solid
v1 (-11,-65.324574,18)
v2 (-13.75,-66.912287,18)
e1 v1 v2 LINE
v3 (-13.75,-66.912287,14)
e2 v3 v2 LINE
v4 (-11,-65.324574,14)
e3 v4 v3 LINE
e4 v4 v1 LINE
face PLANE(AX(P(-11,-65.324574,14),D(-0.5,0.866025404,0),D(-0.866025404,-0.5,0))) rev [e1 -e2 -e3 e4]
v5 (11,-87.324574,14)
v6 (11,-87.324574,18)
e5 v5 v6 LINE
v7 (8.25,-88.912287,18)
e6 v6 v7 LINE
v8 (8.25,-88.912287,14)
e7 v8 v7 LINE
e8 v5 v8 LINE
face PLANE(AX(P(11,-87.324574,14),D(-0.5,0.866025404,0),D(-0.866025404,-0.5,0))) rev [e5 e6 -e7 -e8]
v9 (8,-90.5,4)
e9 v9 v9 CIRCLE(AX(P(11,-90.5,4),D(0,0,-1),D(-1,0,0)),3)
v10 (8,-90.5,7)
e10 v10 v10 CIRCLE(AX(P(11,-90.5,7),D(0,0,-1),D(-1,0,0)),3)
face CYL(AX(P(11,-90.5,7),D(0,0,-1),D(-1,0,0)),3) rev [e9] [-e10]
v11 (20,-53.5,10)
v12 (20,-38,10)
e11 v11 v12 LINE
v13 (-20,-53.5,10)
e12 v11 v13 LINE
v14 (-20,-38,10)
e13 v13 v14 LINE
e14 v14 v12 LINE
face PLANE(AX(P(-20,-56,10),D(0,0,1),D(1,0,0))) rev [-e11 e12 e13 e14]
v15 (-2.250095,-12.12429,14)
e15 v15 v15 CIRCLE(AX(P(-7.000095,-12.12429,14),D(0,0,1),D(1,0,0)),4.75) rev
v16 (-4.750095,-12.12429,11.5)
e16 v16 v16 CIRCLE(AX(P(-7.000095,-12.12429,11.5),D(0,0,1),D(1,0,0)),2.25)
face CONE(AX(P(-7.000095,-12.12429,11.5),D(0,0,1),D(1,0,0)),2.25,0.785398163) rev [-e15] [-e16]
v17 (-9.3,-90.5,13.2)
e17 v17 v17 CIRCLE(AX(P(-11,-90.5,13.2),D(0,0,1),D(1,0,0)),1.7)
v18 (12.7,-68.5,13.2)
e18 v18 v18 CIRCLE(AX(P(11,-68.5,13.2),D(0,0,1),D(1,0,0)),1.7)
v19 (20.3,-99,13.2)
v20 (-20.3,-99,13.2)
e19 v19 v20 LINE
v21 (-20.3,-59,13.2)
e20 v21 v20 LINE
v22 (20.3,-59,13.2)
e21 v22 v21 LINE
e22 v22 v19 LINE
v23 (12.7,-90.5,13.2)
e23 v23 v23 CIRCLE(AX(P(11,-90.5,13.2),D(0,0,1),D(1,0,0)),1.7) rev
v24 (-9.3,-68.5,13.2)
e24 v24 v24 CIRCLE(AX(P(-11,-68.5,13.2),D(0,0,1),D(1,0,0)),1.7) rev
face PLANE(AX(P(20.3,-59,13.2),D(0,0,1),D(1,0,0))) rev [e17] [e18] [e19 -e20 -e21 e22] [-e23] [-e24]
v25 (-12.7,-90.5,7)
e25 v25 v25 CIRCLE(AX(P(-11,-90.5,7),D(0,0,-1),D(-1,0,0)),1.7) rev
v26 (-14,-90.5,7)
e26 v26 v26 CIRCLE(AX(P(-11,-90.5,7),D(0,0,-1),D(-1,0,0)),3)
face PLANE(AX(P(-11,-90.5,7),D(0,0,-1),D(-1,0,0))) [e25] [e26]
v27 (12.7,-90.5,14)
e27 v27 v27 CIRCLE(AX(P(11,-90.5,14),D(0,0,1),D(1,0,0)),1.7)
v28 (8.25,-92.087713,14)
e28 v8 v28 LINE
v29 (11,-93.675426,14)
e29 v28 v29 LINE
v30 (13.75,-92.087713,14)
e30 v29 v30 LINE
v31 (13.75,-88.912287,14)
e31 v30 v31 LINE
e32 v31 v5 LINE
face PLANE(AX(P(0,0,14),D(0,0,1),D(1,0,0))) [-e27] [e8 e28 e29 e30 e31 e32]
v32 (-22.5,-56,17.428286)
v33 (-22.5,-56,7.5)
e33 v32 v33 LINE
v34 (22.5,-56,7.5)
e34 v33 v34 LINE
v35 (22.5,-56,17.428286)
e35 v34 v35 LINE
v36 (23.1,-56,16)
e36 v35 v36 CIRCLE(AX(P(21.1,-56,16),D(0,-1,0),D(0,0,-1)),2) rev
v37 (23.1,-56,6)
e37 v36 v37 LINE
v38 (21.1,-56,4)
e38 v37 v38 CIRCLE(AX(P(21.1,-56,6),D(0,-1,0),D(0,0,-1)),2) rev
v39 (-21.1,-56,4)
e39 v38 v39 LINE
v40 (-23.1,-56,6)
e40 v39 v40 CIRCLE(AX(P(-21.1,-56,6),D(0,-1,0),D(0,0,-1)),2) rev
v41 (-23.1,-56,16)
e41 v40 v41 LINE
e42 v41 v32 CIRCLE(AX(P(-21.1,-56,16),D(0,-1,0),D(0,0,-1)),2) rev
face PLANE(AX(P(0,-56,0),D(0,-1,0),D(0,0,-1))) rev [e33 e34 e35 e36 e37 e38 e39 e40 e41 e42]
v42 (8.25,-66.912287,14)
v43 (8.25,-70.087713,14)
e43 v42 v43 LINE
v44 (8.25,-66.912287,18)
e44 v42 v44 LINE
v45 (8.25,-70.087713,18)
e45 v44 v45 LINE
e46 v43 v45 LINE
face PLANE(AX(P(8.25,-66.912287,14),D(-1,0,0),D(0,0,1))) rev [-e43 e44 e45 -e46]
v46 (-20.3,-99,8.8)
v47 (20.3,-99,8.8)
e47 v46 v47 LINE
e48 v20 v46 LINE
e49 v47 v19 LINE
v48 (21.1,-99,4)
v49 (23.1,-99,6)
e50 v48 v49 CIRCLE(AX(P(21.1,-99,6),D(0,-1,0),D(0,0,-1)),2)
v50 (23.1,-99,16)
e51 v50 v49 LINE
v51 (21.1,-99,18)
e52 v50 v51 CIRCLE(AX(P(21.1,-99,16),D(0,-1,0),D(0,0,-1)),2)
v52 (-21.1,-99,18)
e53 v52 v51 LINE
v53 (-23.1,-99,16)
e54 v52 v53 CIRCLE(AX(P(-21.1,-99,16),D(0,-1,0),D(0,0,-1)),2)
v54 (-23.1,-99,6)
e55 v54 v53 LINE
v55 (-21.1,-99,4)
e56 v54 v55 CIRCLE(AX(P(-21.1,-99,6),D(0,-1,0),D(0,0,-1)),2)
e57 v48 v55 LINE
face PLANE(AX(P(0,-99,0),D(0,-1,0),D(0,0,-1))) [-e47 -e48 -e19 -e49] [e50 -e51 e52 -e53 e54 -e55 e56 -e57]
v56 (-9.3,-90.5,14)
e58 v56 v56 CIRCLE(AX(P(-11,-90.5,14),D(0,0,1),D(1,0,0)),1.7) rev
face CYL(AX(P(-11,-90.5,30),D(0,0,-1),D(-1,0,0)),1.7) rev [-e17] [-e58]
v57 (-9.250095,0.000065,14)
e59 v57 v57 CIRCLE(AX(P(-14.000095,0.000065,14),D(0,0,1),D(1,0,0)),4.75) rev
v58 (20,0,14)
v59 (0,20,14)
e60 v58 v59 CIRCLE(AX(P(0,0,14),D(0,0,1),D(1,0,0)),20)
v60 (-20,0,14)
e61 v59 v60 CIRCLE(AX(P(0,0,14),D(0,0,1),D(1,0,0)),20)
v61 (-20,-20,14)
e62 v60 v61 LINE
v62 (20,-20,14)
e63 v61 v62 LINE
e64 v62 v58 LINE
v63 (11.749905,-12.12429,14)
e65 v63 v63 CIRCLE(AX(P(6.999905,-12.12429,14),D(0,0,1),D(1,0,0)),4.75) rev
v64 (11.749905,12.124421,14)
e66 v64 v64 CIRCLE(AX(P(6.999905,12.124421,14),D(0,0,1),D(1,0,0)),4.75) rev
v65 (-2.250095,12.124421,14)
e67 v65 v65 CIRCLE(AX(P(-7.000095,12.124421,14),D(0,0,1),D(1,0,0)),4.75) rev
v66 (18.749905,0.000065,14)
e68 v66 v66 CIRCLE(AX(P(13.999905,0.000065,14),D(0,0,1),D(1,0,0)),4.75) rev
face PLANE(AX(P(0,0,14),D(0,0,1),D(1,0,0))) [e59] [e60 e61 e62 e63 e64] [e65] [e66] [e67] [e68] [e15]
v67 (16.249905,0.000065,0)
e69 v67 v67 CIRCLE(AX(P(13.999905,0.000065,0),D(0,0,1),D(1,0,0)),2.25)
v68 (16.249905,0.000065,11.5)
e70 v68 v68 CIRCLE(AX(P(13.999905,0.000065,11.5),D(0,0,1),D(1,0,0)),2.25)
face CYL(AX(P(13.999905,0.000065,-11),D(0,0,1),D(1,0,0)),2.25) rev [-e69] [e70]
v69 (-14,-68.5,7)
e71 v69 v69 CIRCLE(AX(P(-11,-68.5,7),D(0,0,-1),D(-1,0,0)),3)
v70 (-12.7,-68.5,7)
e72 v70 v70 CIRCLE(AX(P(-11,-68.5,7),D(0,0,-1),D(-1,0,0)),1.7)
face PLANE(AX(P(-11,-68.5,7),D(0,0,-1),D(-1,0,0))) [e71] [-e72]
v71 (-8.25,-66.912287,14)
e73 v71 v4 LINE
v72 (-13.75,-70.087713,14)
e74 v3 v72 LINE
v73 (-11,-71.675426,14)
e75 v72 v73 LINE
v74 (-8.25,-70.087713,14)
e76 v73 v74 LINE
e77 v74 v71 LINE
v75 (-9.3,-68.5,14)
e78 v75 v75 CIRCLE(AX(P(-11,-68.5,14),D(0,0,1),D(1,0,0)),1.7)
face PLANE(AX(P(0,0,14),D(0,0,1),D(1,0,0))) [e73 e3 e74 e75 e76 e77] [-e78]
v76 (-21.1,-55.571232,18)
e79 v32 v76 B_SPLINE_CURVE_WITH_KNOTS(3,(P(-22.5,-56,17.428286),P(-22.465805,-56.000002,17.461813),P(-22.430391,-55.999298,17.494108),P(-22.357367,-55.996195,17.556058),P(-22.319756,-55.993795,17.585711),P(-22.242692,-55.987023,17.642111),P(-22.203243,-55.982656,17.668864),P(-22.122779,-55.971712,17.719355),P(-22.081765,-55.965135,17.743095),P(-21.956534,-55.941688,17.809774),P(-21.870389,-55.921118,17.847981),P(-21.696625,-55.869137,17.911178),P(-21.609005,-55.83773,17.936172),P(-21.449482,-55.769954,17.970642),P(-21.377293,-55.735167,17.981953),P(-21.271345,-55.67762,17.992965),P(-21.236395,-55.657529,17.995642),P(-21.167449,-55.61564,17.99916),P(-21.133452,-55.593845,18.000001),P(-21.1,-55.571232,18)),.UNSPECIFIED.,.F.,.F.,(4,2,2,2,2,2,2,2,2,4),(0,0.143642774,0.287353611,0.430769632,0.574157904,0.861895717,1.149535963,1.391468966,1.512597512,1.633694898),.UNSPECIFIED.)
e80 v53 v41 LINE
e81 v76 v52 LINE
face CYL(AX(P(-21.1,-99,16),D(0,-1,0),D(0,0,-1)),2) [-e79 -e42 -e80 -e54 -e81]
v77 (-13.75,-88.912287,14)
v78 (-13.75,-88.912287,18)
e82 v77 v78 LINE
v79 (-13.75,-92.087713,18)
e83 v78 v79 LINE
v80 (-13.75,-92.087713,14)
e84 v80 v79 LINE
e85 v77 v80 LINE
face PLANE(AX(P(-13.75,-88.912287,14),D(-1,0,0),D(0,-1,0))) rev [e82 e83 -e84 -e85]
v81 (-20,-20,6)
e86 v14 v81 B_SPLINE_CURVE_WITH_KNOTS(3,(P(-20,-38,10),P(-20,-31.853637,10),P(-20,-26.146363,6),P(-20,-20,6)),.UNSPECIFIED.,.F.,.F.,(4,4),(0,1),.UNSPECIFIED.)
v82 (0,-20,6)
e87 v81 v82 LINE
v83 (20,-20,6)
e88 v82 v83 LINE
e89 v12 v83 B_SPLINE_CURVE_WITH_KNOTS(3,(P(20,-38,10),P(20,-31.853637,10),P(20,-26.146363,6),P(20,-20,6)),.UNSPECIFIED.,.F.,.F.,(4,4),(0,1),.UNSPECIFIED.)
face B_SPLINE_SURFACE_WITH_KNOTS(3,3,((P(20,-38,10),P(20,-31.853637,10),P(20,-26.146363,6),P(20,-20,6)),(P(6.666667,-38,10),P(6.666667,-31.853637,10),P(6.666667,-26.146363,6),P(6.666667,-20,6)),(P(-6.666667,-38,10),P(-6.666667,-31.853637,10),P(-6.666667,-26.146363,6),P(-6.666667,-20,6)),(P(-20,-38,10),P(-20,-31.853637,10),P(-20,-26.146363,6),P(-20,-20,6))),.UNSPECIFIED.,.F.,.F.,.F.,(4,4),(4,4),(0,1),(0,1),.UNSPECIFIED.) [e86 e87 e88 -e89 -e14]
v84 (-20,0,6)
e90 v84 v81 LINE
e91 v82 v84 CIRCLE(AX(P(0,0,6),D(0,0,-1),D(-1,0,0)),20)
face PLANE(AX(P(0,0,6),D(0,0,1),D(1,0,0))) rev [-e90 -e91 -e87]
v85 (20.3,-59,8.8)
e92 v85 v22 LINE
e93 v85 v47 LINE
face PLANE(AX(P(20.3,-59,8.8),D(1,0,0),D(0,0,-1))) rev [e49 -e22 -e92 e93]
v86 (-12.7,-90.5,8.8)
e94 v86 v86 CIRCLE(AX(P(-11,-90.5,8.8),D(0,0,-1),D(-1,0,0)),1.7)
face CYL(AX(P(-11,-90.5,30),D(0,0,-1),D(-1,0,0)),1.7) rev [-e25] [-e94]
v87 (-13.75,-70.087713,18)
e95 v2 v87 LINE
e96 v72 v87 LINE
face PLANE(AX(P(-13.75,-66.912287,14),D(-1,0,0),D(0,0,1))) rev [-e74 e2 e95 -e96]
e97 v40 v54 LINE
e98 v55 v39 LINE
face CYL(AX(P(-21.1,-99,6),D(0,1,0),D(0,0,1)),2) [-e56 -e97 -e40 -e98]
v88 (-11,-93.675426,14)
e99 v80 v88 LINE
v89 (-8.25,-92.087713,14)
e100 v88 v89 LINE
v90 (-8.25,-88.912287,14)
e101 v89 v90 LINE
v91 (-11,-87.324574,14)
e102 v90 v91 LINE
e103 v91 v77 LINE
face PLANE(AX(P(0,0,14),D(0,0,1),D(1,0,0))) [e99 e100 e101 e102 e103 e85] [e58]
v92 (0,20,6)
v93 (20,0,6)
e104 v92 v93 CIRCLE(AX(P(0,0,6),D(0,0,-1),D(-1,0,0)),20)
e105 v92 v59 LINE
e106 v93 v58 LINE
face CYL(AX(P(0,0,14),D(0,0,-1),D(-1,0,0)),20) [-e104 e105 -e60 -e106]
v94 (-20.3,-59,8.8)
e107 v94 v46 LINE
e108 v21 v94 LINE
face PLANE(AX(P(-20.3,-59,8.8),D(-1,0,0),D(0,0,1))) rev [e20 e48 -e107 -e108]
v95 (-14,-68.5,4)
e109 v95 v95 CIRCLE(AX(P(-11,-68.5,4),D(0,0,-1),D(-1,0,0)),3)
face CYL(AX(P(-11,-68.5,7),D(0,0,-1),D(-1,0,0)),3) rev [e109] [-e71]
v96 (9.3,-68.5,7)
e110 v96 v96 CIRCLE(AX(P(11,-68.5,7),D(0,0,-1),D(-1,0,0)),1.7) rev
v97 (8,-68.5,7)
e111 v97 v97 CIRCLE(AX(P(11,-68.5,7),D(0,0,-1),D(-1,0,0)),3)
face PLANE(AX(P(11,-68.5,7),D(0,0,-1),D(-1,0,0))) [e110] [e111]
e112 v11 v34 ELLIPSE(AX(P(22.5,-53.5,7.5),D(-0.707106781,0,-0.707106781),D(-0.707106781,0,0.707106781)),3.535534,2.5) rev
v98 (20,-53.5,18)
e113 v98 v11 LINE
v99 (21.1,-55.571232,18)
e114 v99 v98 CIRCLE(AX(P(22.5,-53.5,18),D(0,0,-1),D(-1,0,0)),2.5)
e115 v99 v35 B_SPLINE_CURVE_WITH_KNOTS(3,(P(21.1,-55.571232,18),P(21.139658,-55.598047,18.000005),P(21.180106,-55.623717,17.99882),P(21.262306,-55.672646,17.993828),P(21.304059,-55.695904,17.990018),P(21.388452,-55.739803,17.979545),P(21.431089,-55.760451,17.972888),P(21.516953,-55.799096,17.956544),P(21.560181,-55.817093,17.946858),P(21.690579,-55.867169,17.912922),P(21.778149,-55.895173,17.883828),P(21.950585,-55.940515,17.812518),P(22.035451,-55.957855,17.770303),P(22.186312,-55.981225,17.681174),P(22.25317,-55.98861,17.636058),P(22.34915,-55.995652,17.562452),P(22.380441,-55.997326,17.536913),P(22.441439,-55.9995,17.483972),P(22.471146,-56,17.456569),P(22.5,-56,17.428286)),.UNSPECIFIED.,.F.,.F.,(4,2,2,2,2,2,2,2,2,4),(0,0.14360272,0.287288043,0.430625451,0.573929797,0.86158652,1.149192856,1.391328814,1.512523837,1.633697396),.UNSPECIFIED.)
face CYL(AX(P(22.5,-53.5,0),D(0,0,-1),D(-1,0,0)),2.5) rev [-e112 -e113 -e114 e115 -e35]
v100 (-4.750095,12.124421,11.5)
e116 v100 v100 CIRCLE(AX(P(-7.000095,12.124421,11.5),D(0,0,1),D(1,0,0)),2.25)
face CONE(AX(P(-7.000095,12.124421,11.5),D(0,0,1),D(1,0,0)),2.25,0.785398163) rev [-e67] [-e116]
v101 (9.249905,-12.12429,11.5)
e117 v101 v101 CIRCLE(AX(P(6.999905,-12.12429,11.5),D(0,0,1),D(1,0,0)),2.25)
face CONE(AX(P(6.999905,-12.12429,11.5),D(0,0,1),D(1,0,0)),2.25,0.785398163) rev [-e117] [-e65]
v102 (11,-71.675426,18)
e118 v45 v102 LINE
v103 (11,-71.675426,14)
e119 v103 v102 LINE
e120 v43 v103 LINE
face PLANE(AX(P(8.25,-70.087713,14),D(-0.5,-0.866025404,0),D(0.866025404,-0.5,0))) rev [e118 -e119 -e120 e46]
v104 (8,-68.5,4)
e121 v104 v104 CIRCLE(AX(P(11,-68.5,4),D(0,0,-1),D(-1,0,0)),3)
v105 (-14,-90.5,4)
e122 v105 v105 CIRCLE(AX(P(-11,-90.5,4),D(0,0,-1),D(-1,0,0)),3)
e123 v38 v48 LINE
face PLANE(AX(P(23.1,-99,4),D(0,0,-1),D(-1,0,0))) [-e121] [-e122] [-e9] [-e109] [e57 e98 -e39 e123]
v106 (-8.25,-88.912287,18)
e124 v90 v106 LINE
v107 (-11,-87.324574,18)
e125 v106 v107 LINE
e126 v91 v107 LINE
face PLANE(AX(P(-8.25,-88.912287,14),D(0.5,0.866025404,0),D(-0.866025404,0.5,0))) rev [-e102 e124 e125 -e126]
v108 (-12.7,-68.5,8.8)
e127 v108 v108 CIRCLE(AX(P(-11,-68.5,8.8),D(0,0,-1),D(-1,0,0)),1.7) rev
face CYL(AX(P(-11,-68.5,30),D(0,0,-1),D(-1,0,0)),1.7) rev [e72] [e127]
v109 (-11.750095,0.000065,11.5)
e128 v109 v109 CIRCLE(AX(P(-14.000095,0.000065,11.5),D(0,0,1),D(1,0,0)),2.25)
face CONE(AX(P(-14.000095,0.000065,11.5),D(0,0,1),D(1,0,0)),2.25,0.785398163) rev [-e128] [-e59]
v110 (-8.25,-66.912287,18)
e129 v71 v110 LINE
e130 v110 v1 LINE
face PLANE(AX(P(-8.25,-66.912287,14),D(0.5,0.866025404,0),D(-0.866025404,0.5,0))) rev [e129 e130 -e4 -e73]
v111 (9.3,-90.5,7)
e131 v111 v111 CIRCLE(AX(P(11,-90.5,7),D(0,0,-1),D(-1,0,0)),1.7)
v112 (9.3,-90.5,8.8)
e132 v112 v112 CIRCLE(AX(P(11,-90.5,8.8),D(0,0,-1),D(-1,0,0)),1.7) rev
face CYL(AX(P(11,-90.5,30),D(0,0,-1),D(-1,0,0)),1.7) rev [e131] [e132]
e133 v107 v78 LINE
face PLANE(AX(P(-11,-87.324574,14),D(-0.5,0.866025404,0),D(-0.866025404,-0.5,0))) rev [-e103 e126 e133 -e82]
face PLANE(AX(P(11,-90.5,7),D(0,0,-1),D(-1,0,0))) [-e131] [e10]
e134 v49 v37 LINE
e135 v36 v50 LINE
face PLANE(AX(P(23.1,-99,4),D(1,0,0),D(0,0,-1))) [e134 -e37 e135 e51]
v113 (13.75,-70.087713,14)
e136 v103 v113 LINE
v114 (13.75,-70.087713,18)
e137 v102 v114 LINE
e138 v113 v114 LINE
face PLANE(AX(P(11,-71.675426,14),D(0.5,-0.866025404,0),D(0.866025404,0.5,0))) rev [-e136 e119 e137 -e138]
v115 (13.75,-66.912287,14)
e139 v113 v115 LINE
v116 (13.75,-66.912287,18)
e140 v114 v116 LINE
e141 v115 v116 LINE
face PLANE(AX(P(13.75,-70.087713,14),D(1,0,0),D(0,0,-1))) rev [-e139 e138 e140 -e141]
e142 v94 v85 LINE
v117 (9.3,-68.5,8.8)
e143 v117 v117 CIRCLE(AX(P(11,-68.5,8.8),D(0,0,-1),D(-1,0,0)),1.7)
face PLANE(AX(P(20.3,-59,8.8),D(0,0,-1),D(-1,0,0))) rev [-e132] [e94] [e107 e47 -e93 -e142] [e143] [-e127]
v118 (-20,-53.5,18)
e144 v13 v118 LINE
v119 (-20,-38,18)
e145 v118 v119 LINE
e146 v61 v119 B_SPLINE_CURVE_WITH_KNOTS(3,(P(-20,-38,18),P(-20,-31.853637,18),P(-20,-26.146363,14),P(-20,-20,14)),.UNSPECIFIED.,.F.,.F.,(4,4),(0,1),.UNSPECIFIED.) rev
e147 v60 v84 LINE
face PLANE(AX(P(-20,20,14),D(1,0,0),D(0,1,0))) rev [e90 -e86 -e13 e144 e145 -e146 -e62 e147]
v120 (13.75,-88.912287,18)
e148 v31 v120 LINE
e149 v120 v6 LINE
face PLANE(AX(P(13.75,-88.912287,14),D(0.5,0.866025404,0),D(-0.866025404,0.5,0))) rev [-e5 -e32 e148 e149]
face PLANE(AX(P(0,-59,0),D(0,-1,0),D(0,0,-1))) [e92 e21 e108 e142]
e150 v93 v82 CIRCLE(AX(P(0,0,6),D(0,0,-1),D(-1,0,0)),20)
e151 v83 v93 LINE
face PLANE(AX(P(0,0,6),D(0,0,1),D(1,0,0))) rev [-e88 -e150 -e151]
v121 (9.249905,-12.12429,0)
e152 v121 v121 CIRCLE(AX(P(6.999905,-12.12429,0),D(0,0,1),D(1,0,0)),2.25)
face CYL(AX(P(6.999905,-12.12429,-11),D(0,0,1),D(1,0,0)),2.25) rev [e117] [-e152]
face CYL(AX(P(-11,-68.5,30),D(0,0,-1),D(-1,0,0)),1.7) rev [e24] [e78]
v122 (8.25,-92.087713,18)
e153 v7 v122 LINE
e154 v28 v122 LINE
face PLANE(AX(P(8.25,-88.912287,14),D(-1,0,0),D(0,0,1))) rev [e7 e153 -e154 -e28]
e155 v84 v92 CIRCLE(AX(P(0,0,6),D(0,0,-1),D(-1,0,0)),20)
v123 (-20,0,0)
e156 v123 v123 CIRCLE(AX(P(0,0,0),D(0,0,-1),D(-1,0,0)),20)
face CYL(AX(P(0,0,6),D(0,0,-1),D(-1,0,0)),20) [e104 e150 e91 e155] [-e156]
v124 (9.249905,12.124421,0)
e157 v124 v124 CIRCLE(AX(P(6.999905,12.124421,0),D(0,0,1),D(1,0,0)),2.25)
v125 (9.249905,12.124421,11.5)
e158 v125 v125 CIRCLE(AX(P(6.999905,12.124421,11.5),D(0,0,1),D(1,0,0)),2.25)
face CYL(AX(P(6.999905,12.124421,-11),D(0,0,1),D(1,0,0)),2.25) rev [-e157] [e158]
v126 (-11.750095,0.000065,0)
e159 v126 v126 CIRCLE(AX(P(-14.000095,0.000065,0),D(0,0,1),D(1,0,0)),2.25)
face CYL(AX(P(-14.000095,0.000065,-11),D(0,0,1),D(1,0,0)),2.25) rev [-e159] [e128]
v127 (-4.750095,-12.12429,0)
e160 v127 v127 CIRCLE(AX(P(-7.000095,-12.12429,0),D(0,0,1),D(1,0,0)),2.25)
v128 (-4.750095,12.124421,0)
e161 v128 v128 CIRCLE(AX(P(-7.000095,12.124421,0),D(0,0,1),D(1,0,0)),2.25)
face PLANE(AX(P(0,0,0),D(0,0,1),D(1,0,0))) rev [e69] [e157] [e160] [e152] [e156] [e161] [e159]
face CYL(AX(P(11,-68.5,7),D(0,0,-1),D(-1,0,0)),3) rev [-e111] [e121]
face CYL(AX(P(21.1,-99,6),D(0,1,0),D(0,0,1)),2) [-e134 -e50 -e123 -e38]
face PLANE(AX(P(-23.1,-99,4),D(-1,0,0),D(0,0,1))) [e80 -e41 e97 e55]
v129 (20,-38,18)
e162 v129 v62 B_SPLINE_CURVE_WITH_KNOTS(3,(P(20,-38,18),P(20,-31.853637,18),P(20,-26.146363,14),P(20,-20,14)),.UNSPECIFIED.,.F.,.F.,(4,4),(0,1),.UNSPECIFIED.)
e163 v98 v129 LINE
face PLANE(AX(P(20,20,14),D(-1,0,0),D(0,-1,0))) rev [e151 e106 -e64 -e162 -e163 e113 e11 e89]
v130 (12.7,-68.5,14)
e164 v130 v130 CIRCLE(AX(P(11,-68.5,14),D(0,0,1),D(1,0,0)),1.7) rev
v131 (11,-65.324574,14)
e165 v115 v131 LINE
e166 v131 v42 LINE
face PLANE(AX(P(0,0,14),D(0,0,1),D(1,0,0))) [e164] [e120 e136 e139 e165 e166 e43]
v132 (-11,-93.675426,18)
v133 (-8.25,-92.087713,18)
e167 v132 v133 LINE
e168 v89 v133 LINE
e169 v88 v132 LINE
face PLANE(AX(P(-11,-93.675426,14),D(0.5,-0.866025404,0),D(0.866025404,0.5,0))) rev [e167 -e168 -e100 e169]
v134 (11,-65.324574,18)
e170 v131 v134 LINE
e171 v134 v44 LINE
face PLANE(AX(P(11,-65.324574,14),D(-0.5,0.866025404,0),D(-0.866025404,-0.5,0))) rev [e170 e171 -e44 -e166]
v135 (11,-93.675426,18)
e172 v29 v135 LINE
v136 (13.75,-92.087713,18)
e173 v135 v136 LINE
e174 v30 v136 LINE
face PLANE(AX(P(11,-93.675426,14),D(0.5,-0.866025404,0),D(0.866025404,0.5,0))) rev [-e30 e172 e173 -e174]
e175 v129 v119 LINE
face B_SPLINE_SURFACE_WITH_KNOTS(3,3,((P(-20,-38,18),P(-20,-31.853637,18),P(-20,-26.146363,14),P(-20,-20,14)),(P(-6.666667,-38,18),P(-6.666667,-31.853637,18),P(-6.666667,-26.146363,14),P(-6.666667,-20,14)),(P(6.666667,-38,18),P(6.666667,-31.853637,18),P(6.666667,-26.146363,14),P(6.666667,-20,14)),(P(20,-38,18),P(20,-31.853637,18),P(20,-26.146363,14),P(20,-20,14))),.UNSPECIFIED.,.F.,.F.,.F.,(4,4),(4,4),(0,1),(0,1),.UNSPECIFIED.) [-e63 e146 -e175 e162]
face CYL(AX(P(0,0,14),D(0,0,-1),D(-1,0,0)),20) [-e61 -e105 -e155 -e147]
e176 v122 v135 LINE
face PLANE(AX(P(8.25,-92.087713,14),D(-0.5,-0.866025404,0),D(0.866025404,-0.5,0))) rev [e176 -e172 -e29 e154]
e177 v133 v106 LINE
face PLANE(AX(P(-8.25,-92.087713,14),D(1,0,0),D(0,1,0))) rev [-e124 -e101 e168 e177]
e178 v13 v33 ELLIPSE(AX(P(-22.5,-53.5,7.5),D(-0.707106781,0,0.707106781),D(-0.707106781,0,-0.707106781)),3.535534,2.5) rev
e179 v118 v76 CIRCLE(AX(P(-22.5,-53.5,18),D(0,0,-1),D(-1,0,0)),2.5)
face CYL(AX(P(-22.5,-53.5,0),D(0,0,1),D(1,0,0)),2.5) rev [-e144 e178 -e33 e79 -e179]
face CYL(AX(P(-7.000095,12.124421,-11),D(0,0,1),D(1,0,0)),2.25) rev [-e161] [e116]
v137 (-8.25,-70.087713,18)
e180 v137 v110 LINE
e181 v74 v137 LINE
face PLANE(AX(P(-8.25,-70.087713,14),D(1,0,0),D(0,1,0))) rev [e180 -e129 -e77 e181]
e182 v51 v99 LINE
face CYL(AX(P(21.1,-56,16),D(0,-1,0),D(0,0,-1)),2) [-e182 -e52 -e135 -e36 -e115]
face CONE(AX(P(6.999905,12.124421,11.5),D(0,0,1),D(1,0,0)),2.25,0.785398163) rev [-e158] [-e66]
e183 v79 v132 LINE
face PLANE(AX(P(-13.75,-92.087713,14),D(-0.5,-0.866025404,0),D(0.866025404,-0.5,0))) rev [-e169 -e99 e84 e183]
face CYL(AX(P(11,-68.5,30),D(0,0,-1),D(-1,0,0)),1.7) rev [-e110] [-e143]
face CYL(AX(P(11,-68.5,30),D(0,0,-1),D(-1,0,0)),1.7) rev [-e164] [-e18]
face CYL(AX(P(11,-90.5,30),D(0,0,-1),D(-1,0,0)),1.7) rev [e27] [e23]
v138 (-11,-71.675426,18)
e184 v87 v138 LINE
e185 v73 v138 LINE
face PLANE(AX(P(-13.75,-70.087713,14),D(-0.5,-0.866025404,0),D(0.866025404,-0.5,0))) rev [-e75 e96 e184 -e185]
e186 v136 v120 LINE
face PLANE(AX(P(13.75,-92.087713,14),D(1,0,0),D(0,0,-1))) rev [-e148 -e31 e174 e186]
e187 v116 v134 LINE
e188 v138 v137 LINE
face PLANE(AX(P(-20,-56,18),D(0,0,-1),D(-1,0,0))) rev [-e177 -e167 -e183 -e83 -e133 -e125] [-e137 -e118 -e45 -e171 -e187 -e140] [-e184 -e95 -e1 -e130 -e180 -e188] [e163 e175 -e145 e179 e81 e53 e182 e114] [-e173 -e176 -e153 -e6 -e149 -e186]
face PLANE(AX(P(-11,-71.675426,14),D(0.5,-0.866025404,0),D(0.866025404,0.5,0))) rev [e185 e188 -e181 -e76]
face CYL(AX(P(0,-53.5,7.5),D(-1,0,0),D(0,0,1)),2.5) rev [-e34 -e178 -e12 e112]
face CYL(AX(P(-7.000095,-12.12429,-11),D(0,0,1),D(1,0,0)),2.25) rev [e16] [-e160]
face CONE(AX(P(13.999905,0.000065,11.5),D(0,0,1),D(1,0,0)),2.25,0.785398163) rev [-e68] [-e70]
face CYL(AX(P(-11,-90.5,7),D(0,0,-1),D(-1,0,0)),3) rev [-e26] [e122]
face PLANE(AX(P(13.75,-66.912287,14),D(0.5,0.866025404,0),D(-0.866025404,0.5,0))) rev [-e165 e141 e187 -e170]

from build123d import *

# Parameters (mm, degrees)
SKETCH7_W           = 40
SKETCH7_H           = 40
BOSS_EXTRUDE1_DEPTH = 14
LOFT1_START         = -20
LOFT1_DEPTH         = 40
SKETCH16_W          = 49.026286786
SKETCH16_H          = 65.242270374
SKETCH16_R          = 20
CUT_EXTRUDE3_DEPTH  = 6
SKETCH17_W          = 40
SKETCH17_H          = 8
BOSS_EXTRUDE5_DEPTH = 18
SKETCH10_R          = 2.25
CUT_EXTRUDE1_DEPTH  = 25
CHAMFER1_SIZE       = 2.5
FILLET3_R           = 20
SKETCH11_W          = 46.2
SKETCH11_H          = 14
BOSS_EXTRUDE6_DEPTH = 43
FILLET9_R           = 2.5
SKETCH20_W          = 40.6
SKETCH20_H          = 4.4
CUT_EXTRUDE4_DEPTH  = 40
SKETCH22_R          = 1.7
CUT_EXTRUDE5_DEPTH  = 30
FILLET11_R          = 2
CUT_EXTRUDE6_DEPTH  = 4
SKETCH24_R          = 3
CUT_EXTRUDE7_DEPTH  = 3


# Read off the part's stored shape, not the designer's step: Loft1
with BuildPart() as part:
    # Sketch7 → Boss-Extrude1 (new body)
    with BuildSketch(Plane.XY):
        Rectangle(SKETCH7_W, SKETCH7_H)
    extrude(amount=BOSS_EXTRUDE1_DEPTH)

    # Loft1 outline → Loft1 (add)
    with BuildSketch(Plane.YZ.offset(LOFT1_START)):
        with BuildLine():
            add(Edge.make_bspline(
                [(-38, 18), (-31.853637028, 18), (-26.146362972, 14), (-20, 14)],
                knots=[0, 0, 0, 0, 1, 1, 1, 1], degree=3))
            Line((-38, 18), (-38, 10))
            add(Edge.make_bspline(
                [(-38, 10), (-31.853637028, 10), (-26.146362972, 6), (-20, 6)],
                knots=[0, 0, 0, 0, 1, 1, 1, 1], degree=3))
            Line((-20, 6), (-20, 14))
        make_face()
    extrude(amount=LOFT1_DEPTH)

    # Sketch16 → Cut-Extrude3 (cut)
    with BuildSketch(Plane(origin=(0, 0, 0), x_dir=(-1, 0, 0), z_dir=(0, 0, -1))):
        Rectangle(SKETCH16_W, SKETCH16_H)
        Circle(SKETCH16_R, mode=Mode.SUBTRACT)
    extrude(amount=-CUT_EXTRUDE3_DEPTH, mode=Mode.SUBTRACT)

    # Sketch17 → Boss-Extrude5 (add)
    with BuildSketch(Plane(origin=(0, -38, 0), x_dir=(-1, 0, 0), z_dir=(0, -1, 0))):
        with Locations((0, -14)):
            Rectangle(SKETCH17_W, SKETCH17_H)
    extrude(amount=BOSS_EXTRUDE5_DEPTH)

    # Sketch10 → Cut-Extrude1 (cut)
    with BuildSketch(Plane.XY.offset(14)):
        with Locations((-7.00009521, 12.124420806)):
            Circle(SKETCH10_R)
        with Locations((6.99990479, 12.124420806)):
            Circle(SKETCH10_R)
        with Locations((13.99990479, 6.5153e-05)):
            Circle(SKETCH10_R)
        with Locations((6.99990479, -12.1242905)):
            Circle(SKETCH10_R)
        with Locations((-7.00009521, -12.1242905)):
            Circle(SKETCH10_R)
        with Locations((-14.00009521, 6.5153e-05)):
            Circle(SKETCH10_R)
    extrude(amount=-CUT_EXTRUDE1_DEPTH, mode=Mode.SUBTRACT)

    # Chamfer1
    chamfer1_edges = [part.edges().sort_by_distance(p)[0] for p in [
        (4.74990479, 12.124420806, 14),
        (-9.25009521, 12.124420806, 14),
        (-16.25009521, 6.5153e-05, 14),
        (-9.25009521, -12.1242905, 14),
        (4.74990479, -12.1242905, 14),
        (11.74990479, 6.5153e-05, 14),
    ]]
    chamfer(chamfer1_edges, length=CHAMFER1_SIZE)

    # Fillet3
    fillet3_edges = [part.edges().sort_by_distance(p)[0] for p in [
        (20, 20, 10),
        (-20, 20, 10),
    ]]
    fillet(fillet3_edges, radius=FILLET3_R - 0.0001)  # a hair under: the kernel refuses the full size

    # Sketch11 → Boss-Extrude6 (add)
    with BuildSketch(Plane(origin=(0, -56, -3.472963553), x_dir=(1, 0, 0), z_dir=(0, 1, 0))):
        with Locations((0, -14.472963553)):
            Rectangle(SKETCH11_W, SKETCH11_H)
    extrude(amount=-BOSS_EXTRUDE6_DEPTH)

    # Fillet9
    fillet9_edges = [part.edges().sort_by_distance(p)[0] for p in [
        (0, -56, 10),
        (-20, -56, 14),
        (20, -56, 14),
    ]]
    fillet(fillet9_edges, radius=FILLET9_R)

    # Sketch20 → Cut-Extrude4 (cut)
    with BuildSketch(Plane.XZ.offset(99)):
        with Locations((0, 11)):
            Rectangle(SKETCH20_W, SKETCH20_H)
    extrude(amount=-CUT_EXTRUDE4_DEPTH, mode=Mode.SUBTRACT)

    # Sketch22 → Cut-Extrude5 (cut)
    with BuildSketch(Plane.XY):
        with Locations(Location((11, -68.5, 0), (0, 0, 180))):
            Circle(SKETCH22_R)
        with Locations(Location((11, -90.5, 0), (0, 0, 180))):
            Circle(SKETCH22_R)
        with Locations(Location((-11, -90.5, 0), (0, 0, 180))):
            Circle(SKETCH22_R)
        with Locations(Location((-11, -68.5, 0), (0, 0, 180))):
            Circle(SKETCH22_R)
    extrude(amount=CUT_EXTRUDE5_DEPTH, mode=Mode.SUBTRACT)

    # Fillet11
    fillet11_edges = [part.edges().sort_by_distance(p)[0] for p in [
        (-23.1, -77.5, 18),
        (-23.1, -77.5, 4),
        (23.1, -77.5, 18),
        (23.1, -77.5, 4),
    ]]
    fillet(fillet11_edges, radius=FILLET11_R)

    # Sketch23 → Cut-Extrude6 (cut)
    with BuildSketch(Plane.XY.offset(18)):
        Polygon((-11, -65.324573519), (-13.75, -66.91228676), (-13.75, -70.08771324), (-11, -71.675426481), (-8.25, -70.08771324), (-8.25, -66.91228676), align=None)
        Polygon((11, -65.324573519), (8.25, -66.91228676), (8.25, -70.08771324), (11, -71.675426481), (13.75, -70.08771324), (13.75, -66.91228676), align=None)
        Polygon((11, -87.324573519), (8.25, -88.91228676), (8.25, -92.08771324), (11, -93.675426481), (13.75, -92.08771324), (13.75, -88.91228676), align=None)
        Polygon((-11, -87.324573519), (-13.75, -88.91228676), (-13.75, -92.08771324), (-11, -93.675426481), (-8.25, -92.08771324), (-8.25, -88.91228676), align=None)
    extrude(amount=-CUT_EXTRUDE6_DEPTH, mode=Mode.SUBTRACT)

    # Sketch24 → Cut-Extrude7 (cut)
    with BuildSketch(Plane(origin=(0, 0, 4), x_dir=(-1, 0, 0), z_dir=(0, 0, -1))):
        with Locations((-11, -68.5)):
            Circle(SKETCH24_R)
        with Locations((11, -68.5)):
            Circle(SKETCH24_R)
        with Locations((11, -90.5)):
            Circle(SKETCH24_R)
        with Locations((-11, -90.5)):
            Circle(SKETCH24_R)
    extrude(amount=-CUT_EXTRUDE7_DEPTH, mode=Mode.SUBTRACT)


solid = part.part
